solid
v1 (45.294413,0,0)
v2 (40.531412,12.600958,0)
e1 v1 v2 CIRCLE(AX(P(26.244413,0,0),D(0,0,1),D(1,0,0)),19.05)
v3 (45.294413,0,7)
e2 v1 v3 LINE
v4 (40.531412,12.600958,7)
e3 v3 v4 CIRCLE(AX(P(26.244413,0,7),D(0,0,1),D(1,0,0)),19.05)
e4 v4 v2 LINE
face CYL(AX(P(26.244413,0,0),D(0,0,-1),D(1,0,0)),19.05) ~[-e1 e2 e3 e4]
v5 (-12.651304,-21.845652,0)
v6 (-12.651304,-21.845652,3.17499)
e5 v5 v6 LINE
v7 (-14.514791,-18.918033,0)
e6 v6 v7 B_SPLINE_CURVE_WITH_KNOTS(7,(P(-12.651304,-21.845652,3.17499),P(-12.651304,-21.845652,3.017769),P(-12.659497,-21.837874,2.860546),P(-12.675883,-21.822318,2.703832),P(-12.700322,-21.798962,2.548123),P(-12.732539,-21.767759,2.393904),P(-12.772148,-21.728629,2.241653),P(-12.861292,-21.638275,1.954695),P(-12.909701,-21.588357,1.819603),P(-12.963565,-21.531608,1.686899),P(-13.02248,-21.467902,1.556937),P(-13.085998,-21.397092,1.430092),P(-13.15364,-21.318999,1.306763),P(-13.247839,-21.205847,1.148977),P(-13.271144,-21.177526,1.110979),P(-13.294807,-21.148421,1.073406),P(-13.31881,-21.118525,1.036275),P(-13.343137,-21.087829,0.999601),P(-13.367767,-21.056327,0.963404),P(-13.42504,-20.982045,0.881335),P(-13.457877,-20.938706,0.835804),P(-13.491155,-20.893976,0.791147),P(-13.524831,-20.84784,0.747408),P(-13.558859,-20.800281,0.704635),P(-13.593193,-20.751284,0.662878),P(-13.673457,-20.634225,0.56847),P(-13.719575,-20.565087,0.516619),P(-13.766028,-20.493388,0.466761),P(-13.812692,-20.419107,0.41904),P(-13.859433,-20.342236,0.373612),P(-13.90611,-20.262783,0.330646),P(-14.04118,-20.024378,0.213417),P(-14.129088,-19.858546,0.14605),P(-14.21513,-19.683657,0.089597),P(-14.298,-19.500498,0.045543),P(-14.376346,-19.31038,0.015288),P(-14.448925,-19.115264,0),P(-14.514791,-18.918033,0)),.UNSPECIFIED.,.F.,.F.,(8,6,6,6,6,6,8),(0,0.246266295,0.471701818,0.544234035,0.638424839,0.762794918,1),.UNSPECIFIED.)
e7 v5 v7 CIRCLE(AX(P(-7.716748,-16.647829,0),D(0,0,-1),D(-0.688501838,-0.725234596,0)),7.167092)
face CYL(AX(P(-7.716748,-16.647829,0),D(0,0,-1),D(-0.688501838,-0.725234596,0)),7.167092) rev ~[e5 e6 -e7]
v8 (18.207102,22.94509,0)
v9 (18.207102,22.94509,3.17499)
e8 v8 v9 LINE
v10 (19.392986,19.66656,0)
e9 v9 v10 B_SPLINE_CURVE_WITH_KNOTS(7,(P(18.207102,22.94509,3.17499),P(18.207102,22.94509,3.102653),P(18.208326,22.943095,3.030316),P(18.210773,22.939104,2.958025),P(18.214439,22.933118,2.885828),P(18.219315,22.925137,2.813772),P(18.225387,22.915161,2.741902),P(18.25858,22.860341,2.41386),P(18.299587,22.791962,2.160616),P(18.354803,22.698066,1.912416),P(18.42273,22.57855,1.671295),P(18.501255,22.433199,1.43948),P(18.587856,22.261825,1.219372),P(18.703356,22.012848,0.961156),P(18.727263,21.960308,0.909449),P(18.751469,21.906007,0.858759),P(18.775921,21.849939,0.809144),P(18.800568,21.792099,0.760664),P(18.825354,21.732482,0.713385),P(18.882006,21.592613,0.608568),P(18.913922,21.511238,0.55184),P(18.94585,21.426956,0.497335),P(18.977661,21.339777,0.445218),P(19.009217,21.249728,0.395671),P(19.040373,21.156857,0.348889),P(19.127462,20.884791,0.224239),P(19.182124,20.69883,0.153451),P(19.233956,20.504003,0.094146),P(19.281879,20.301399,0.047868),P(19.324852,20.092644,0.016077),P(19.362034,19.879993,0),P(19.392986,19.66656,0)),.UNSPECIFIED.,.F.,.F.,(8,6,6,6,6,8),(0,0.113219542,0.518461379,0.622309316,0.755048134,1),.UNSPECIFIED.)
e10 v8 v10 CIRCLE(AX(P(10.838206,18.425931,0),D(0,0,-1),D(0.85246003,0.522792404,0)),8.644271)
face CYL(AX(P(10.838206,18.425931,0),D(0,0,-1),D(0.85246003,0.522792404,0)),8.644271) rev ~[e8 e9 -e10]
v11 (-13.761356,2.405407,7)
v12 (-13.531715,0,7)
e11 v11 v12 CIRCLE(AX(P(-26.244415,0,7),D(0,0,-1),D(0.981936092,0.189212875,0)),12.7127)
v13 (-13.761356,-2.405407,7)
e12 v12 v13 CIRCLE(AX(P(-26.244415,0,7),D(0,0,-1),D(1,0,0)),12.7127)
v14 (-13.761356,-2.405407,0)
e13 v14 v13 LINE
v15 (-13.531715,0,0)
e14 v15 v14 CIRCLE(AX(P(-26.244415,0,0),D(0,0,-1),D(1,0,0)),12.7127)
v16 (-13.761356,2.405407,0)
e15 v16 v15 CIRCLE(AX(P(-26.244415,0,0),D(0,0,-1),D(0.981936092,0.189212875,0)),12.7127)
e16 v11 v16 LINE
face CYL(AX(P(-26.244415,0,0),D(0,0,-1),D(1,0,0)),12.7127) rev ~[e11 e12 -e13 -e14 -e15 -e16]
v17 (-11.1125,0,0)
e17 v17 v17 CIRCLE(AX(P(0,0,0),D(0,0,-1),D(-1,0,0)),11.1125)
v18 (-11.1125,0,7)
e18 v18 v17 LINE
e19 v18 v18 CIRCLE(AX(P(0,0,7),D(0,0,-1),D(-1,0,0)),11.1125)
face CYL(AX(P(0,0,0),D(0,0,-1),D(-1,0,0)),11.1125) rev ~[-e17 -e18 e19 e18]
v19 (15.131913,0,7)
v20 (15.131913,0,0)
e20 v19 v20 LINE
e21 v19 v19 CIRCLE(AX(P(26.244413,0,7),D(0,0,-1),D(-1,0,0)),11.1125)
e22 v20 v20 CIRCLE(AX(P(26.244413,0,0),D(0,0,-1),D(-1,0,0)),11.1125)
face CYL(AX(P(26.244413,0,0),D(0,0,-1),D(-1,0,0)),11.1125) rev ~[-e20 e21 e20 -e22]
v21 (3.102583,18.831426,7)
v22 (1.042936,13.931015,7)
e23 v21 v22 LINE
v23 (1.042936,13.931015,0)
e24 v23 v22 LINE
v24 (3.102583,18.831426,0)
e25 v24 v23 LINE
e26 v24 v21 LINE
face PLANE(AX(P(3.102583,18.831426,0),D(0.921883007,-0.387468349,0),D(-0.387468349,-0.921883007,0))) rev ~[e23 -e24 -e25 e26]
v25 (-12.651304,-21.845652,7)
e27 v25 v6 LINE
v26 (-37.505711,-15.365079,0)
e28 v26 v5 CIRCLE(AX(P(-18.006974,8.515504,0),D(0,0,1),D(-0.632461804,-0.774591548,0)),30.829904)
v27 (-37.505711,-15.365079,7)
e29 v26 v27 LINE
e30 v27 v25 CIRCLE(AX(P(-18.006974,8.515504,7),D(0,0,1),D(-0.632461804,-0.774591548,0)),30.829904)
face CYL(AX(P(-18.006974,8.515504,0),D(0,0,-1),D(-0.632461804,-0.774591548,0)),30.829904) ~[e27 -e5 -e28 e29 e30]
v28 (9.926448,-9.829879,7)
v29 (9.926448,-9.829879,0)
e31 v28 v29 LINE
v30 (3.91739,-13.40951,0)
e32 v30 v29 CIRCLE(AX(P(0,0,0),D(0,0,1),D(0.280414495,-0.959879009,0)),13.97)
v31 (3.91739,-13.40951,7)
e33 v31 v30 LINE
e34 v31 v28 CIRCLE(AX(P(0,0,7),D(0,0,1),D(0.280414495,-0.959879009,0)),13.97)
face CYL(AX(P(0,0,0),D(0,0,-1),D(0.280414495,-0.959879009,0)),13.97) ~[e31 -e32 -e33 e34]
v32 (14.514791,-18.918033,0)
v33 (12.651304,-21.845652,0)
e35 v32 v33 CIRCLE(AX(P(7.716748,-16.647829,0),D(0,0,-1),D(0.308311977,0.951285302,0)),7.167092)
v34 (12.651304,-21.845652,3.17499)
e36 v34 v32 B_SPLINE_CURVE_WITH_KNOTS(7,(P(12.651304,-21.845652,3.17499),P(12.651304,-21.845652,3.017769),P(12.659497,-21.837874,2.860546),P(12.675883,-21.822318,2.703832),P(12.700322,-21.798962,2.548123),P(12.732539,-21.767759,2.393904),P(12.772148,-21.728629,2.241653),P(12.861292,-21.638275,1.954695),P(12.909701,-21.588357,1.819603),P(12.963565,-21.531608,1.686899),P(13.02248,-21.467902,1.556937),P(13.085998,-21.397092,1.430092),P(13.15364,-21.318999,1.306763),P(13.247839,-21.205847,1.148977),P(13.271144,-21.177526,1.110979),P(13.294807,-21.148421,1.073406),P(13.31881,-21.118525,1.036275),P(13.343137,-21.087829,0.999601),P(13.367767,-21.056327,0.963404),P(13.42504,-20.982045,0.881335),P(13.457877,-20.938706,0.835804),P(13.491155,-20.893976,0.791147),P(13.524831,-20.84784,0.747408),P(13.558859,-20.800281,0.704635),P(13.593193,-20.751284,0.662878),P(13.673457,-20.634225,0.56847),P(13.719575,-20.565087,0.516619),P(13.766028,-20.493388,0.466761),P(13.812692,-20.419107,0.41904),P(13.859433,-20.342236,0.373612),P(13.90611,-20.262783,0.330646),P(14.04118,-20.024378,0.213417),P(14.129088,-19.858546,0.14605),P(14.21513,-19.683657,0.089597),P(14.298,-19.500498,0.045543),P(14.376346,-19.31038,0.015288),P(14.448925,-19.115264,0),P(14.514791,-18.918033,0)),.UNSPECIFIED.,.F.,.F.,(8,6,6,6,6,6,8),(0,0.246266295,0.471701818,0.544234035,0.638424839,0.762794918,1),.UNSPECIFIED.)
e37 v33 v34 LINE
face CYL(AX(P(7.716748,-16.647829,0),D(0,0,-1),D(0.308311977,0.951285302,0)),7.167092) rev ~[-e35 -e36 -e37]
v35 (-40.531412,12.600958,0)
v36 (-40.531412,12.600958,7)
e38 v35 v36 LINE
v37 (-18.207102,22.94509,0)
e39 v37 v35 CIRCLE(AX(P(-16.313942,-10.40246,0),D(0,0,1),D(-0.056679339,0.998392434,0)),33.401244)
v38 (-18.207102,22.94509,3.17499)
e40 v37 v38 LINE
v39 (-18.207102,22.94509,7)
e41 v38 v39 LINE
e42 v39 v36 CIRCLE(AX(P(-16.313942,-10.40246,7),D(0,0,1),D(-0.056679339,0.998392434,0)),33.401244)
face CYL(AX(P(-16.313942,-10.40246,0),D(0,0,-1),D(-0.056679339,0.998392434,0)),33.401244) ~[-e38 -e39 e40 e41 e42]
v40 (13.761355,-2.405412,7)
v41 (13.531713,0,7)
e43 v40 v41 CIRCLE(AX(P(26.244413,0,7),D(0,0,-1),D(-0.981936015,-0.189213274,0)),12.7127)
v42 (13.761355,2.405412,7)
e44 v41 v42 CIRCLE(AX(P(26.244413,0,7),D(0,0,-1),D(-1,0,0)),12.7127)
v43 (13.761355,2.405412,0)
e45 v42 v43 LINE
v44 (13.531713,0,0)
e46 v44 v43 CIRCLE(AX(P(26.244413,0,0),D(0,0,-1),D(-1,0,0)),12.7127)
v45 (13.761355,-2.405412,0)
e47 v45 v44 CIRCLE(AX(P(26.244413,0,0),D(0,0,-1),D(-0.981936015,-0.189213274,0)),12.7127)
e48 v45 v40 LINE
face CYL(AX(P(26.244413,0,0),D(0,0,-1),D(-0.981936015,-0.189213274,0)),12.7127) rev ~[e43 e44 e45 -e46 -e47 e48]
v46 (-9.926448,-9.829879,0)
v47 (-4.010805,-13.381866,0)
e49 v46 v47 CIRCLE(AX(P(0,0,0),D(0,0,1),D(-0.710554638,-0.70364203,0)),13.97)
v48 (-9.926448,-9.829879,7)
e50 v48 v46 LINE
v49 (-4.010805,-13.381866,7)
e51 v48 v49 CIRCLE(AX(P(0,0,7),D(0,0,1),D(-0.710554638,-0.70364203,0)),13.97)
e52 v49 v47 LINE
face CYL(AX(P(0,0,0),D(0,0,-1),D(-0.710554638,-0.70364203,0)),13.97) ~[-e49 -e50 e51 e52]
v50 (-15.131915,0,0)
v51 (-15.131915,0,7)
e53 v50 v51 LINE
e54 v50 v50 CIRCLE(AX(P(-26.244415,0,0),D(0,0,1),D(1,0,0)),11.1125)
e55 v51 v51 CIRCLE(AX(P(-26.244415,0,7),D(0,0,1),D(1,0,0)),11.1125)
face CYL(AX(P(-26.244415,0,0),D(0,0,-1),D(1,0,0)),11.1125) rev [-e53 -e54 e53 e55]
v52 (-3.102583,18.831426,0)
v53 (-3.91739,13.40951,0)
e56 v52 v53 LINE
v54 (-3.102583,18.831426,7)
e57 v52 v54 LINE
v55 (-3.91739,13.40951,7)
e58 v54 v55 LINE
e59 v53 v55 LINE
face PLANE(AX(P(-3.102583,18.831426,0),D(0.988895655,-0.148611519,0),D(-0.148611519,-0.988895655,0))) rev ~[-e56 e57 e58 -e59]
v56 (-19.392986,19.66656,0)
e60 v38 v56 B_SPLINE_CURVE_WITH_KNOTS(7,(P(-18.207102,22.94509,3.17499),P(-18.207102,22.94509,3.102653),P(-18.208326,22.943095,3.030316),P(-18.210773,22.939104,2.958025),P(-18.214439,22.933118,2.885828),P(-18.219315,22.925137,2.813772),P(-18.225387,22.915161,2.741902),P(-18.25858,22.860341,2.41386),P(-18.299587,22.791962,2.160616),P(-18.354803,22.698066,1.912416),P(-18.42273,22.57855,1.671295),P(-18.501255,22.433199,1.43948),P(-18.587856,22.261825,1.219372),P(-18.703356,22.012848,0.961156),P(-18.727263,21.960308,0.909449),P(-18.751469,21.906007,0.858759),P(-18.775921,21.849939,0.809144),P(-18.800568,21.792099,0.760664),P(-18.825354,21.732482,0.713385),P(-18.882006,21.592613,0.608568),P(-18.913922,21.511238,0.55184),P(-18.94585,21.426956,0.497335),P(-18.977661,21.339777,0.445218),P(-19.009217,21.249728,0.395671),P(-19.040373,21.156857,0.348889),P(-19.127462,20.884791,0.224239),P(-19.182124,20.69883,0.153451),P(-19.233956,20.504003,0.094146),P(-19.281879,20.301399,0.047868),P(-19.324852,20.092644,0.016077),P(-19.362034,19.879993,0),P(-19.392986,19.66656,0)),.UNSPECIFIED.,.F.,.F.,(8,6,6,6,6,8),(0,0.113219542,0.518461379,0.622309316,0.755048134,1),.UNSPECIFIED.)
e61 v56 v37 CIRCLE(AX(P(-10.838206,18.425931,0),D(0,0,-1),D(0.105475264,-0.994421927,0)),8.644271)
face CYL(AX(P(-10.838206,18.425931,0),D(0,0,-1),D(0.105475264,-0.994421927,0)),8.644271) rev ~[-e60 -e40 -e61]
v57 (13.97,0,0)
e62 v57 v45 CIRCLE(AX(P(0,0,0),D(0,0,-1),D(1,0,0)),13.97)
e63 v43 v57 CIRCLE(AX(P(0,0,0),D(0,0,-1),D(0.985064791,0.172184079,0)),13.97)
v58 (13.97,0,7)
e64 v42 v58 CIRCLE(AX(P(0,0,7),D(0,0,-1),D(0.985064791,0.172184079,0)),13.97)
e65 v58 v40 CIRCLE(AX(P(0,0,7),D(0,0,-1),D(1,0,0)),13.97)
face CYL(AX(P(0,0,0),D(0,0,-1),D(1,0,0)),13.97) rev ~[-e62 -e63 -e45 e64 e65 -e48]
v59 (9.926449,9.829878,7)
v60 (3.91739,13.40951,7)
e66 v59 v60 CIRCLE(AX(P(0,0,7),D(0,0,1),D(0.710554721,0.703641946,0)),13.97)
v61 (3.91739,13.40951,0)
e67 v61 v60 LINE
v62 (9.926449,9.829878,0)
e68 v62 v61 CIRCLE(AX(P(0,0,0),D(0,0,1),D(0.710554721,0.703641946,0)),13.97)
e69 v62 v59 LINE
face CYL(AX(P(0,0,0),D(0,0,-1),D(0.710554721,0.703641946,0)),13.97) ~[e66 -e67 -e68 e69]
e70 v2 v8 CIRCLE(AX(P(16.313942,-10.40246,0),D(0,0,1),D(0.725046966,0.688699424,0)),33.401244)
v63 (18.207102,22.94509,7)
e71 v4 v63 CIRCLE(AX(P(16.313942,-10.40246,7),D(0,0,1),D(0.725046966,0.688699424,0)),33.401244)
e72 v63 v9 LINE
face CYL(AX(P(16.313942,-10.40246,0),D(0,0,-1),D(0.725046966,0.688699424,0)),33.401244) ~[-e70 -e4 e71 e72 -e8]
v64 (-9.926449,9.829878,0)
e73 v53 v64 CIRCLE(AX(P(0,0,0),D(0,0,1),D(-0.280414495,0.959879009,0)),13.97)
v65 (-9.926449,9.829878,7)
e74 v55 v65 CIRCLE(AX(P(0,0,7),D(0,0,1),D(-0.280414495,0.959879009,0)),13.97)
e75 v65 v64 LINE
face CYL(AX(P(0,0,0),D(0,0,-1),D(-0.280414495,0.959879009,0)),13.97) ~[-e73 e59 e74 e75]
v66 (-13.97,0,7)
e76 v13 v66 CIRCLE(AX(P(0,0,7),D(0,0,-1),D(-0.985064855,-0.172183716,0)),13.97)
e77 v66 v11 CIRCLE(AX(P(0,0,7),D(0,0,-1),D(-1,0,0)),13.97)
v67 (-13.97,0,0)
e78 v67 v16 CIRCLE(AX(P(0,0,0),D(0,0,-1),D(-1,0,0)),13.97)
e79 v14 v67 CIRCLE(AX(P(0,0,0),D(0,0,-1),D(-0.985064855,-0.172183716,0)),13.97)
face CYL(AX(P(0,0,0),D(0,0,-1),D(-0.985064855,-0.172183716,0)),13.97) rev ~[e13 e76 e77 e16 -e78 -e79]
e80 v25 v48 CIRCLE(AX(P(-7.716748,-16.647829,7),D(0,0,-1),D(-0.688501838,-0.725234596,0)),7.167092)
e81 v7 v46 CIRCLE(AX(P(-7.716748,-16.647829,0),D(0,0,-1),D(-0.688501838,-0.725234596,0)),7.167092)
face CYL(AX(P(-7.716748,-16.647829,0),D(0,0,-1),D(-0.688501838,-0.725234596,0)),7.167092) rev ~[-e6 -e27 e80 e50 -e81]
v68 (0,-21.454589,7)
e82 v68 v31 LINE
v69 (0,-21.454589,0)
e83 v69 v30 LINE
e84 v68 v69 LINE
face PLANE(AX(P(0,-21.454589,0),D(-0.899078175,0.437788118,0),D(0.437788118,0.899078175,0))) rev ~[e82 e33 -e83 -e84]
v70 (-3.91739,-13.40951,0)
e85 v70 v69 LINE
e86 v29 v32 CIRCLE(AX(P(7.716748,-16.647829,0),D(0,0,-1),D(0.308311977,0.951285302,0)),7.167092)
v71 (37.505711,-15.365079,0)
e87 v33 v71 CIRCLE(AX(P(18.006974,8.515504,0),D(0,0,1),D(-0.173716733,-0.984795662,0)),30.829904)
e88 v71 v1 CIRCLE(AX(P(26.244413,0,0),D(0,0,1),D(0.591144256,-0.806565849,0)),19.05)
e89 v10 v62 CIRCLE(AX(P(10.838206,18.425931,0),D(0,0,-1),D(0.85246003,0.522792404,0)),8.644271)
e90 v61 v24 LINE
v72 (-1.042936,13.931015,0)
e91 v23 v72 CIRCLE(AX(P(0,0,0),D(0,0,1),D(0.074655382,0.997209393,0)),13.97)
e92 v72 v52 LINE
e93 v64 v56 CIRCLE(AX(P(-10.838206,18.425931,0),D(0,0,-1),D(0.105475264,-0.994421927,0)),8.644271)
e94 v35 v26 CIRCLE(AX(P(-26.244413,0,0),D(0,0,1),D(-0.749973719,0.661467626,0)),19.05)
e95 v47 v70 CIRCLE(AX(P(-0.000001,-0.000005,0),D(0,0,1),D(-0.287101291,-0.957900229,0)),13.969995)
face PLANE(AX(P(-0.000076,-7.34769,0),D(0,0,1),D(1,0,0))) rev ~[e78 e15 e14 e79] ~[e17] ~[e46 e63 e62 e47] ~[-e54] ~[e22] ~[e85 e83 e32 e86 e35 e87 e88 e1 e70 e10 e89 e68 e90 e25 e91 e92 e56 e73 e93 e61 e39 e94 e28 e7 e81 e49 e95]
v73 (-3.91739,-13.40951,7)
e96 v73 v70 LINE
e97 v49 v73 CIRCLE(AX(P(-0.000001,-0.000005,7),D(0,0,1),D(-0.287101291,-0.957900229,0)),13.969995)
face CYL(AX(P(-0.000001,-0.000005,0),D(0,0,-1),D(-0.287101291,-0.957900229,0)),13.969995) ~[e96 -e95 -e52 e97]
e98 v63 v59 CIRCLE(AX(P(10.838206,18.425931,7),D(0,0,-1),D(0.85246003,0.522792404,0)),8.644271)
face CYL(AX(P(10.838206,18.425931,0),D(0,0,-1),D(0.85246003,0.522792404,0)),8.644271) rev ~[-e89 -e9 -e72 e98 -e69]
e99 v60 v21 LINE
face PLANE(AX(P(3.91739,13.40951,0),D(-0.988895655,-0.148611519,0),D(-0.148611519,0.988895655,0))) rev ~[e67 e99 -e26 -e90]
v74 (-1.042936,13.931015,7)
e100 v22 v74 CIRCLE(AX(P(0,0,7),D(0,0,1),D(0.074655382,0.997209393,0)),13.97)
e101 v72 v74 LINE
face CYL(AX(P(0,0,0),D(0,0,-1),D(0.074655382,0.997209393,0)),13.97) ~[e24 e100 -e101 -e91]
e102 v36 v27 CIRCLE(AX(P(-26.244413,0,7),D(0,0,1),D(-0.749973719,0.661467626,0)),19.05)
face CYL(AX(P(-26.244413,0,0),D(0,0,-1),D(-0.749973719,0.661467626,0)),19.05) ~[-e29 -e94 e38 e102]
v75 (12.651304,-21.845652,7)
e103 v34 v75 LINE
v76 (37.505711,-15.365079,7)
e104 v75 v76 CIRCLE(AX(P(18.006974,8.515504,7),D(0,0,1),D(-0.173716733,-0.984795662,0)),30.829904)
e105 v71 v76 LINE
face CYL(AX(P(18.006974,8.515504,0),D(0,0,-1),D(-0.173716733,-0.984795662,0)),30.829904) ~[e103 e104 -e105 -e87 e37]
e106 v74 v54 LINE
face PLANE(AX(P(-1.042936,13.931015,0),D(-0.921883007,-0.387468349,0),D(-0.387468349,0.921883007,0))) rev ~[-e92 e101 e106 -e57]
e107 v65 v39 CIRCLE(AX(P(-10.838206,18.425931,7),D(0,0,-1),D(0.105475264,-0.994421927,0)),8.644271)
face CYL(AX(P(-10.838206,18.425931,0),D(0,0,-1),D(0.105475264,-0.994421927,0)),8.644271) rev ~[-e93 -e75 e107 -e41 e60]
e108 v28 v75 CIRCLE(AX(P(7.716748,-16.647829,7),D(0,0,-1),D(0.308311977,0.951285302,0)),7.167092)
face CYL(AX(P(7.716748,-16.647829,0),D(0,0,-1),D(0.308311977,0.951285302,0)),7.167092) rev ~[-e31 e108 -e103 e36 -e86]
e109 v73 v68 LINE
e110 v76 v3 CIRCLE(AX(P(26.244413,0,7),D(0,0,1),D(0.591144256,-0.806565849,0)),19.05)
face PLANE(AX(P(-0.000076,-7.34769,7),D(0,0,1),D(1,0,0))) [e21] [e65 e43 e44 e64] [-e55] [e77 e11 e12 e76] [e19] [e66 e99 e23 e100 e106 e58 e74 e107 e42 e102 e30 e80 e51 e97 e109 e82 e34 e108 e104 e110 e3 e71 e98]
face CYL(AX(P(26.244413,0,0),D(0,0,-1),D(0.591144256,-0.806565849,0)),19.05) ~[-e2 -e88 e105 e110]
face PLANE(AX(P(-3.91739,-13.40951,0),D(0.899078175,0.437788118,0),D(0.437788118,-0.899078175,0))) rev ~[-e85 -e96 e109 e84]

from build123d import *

# Parameters (mm, degrees)
F0_R     = 11.1125
F1_DEPTH = 6.35
F2_R     = 3.17499
F3_DEPTH = 7


# Not quite as in the source:
# - a fillet or chamfer is up to 0.001 mm smaller than in the source, because OpenCascade refuses the exact size


with BuildPart() as f1:
    # F0 (on Top) → F1 (new body)
    with BuildSketch(Plane.XY):
        with BuildLine():
            ThreePointArc((-9.9264482926, -9.8298791597), (-7.1913775024, -11.9768522417), (-4.010805007, -13.3818662075))
            ThreePointArc((-4.010805007, -13.3818662075), (-3.9641218469, -13.3957694062), (-3.9173904939, -13.4095097494))
            ThreePointArc((-3.9173904939, -13.4095097494), (0, -13.97), (3.9173904939, -13.4095097494))
            ThreePointArc((3.9173904939, -13.4095097494), (7.1495738947, -12.001853737), (9.9264482926, -9.8298791597))
            ThreePointArc((9.9264482926, -9.8298791597), (12.4120380065, -6.4111007266), (13.7613551332, -2.4054115859))
            ThreePointArc((13.7613551332, -2.4054115859), (13.5892538356, -1.2081742794), (13.5317131076, 0))
            Line((13.5317131076, 0), (11.1125, 0))
            ThreePointArc((11.1125, 0), (0, -11.1125), (-11.1125, 0))
            Line((-11.1125, 0), (-13.5317149703, 0))
            ThreePointArc((-13.5317149703, 0), (-13.589255453, -1.2081717101), (-13.7613560192, -2.4054065173))
            ThreePointArc((-13.7613560192, -2.4054065173), (-12.4120391871, -6.4110984408), (-9.9264482926, -9.8298791597))
        make_face()
        with BuildLine():
            ThreePointArc((3.9173904939, -13.4095097494), (0, -13.97), (-3.9173904939, -13.4095097494))
            Line((-3.9173904939, -13.4095097494), (0, -21.4545894414))
            Line((0, -21.4545894414), (3.9173904939, -13.4095097494))
        make_face()
        with BuildLine():
            ThreePointArc((-12.6513041413, -21.8456521056), (-14.7063688094, -15.0627697401), (-9.9264482926, -9.8298791597))
            ThreePointArc((-9.9264482926, -9.8298791597), (-12.4120391871, -6.4110984408), (-13.7613560192, -2.4054065173))
            ThreePointArc((-13.7613560192, -2.4054065173), (-13.9177412605, -1.2072192038), (-13.97, 0))
            ThreePointArc((-13.97, 0), (-13.9177412605, 1.2072192038), (-13.7613560192, 2.4054065173))
            ThreePointArc((-13.7613560192, 2.4054065173), (-12.4120395648, 6.4110977096), (-9.9264494507, 9.8298779902))
            ThreePointArc((-9.9264494507, 9.8298779902), (-18.1475057056, 13.8110021796), (-18.2071019663, 22.9450902043))
            ThreePointArc((-18.2071019663, 22.9450902043), (-30.3564318276, 19.9035068059), (-40.5314124536, 12.6009582845))
            ThreePointArc((-40.5314124536, 12.6009582845), (-45.1838875342, -2.0490994228), (-37.5057111895, -15.3650794177))
            ThreePointArc((-37.5057111895, -15.3650794177), (-25.7855371398, -21.3169777129), (-12.6513041413, -21.8456521056))
        make_face()
        with Locations((-26.2444149703, 0)):
            Circle(F0_R, mode=Mode.SUBTRACT)
        with BuildLine():
            ThreePointArc((13.7613551332, -2.4054115859), (12.4120380065, -6.4111007266), (9.9264482926, -9.8298791597))
            ThreePointArc((9.9264482926, -9.8298791597), (14.7063688094, -15.0627697401), (12.6513041413, -21.8456521056))
            ThreePointArc((12.6513041413, -21.8456521056), (25.7855371398, -21.3169777129), (37.5057111895, -15.3650794177))
            ThreePointArc((37.5057111895, -15.3650794177), (43.2360320484, -8.6132099574), (45.2944131076, 0))
            Line((45.2944131076, 0), (37.3569131076, 0))
            ThreePointArc((37.3569131076, 0), (26.2444131076, -11.1125), (15.1319131076, 0))
            Line((15.1319131076, 0), (13.97, 0))
            ThreePointArc((13.97, 0), (13.9177410382, -1.2072217669), (13.7613551332, -2.4054115859))
        make_face()
        with BuildLine():
            ThreePointArc((-13.7613560192, 2.4054065173), (-13.589255453, 1.2081717101), (-13.5317149703, 0))
            Line((-13.5317149703, 0), (-11.1125, 0))
            ThreePointArc((-11.1125, 0), (0, 11.1125), (11.1125, 0))
            Line((11.1125, 0), (13.5317131076, 0))
            ThreePointArc((13.5317131076, 0), (13.5892538356, 1.2081742794), (13.7613551332, 2.4054115859))
            ThreePointArc((13.7613551332, 2.4054115859), (12.4120383841, 6.4110999954), (9.9264494507, 9.8298779902))
            ThreePointArc((9.9264494507, 9.8298779902), (7.1495746018, 12.0018533158), (3.9173904939, 13.4095097494))
            ThreePointArc((3.9173904939, 13.4095097494), (2.4938325804, 13.7456065367), (1.0429356844, 13.9310152235))
            ThreePointArc((1.0429356844, 13.9310152235), (0, 13.97), (-1.0429356844, 13.9310152235))
            ThreePointArc((-1.0429356844, 13.9310152235), (-2.4938325804, 13.7456065367), (-3.9173904939, 13.4095097494))
            ThreePointArc((-3.9173904939, 13.4095097494), (-7.1495746018, 12.0018533158), (-9.9264494507, 9.8298779902))
            ThreePointArc((-9.9264494507, 9.8298779902), (-12.4120395648, 6.4110977096), (-13.7613560192, 2.4054065173))
        make_face()
        with BuildLine():
            ThreePointArc((13.7613551332, 2.4054115859), (13.9177410382, 1.2072217669), (13.97, 0))
            Line((13.97, 0), (15.1319131076, 0))
            ThreePointArc((15.1319131076, 0), (26.2444131076, 11.1125), (37.3569131076, 0))
            Line((37.3569131076, 0), (45.2944131076, 0))
            ThreePointArc((45.2944131076, 0), (44.0639226062, 6.7355460973), (40.5314124536, 12.6009582845))
            ThreePointArc((40.5314124536, 12.6009582845), (30.3564318276, 19.9035068059), (18.2071019663, 22.9450902043))
            ThreePointArc((18.2071019663, 22.9450902043), (18.1475057056, 13.8110021796), (9.9264494507, 9.8298779902))
            ThreePointArc((9.9264494507, 9.8298779902), (12.4120383841, 6.4110999954), (13.7613551332, 2.4054115859))
        make_face()
        with BuildLine():
            Line((-3.102583345, 18.8314262778), (-3.9173904939, 13.4095097494))
            ThreePointArc((-3.9173904939, 13.4095097494), (-2.4938325804, 13.7456065367), (-1.0429356844, 13.9310152235))
            Line((-1.0429356844, 13.9310152235), (-3.102583345, 18.8314262778))
        make_face()
        with BuildLine():
            ThreePointArc((1.0429356844, 13.9310152235), (2.4938325804, 13.7456065367), (3.9173904939, 13.4095097494))
            Line((3.9173904939, 13.4095097494), (3.102583345, 18.8314262778))
            Line((3.102583345, 18.8314262778), (1.0429356844, 13.9310152235))
        make_face()
    extrude(amount=F1_DEPTH)

    # F2 (radius 3.175 in the source; OpenCascade refuses exactly that, so slightly less here)
    f2_edges = [f1.edges().sort_by_distance(p)[0] for p in [
        (-45.183888, -2.049099, 6.35),
        (45.183888, -2.049099, 6.35),
        (45.183888, -2.049099, 0),
        (-45.183888, -2.049099, 0),
    ]]
    fillet(f2_edges, radius=F2_R)

    # F0 (on Top) → F3 (join)
    with BuildSketch(Plane.XY):
        with BuildLine():
            ThreePointArc((-9.9264482926, -9.8298791597), (-7.1913775024, -11.9768522417), (-4.010805007, -13.3818662075))
            ThreePointArc((-4.010805007, -13.3818662075), (-3.9641218469, -13.3957694062), (-3.9173904939, -13.4095097494))
            ThreePointArc((-3.9173904939, -13.4095097494), (0, -13.97), (3.9173904939, -13.4095097494))
            ThreePointArc((3.9173904939, -13.4095097494), (7.1495738947, -12.001853737), (9.9264482926, -9.8298791597))
            ThreePointArc((9.9264482926, -9.8298791597), (12.4120380065, -6.4111007266), (13.7613551332, -2.4054115859))
            ThreePointArc((13.7613551332, -2.4054115859), (13.5892538356, -1.2081742794), (13.5317131076, 0))
            Line((13.5317131076, 0), (11.1125, 0))
            ThreePointArc((11.1125, 0), (0, -11.1125), (-11.1125, 0))
            Line((-11.1125, 0), (-13.5317149703, 0))
            ThreePointArc((-13.5317149703, 0), (-13.589255453, -1.2081717101), (-13.7613560192, -2.4054065173))
            ThreePointArc((-13.7613560192, -2.4054065173), (-12.4120391871, -6.4110984408), (-9.9264482926, -9.8298791597))
        make_face()
        with BuildLine():
            ThreePointArc((3.9173904939, -13.4095097494), (0, -13.97), (-3.9173904939, -13.4095097494))
            Line((-3.9173904939, -13.4095097494), (0, -21.4545894414))
            Line((0, -21.4545894414), (3.9173904939, -13.4095097494))
        make_face()
        with BuildLine():
            ThreePointArc((-12.6513041413, -21.8456521056), (-14.7063688094, -15.0627697401), (-9.9264482926, -9.8298791597))
            ThreePointArc((-9.9264482926, -9.8298791597), (-12.4120391871, -6.4110984408), (-13.7613560192, -2.4054065173))
            ThreePointArc((-13.7613560192, -2.4054065173), (-13.9177412605, -1.2072192038), (-13.97, 0))
            ThreePointArc((-13.97, 0), (-13.9177412605, 1.2072192038), (-13.7613560192, 2.4054065173))
            ThreePointArc((-13.7613560192, 2.4054065173), (-12.4120395648, 6.4110977096), (-9.9264494507, 9.8298779902))
            ThreePointArc((-9.9264494507, 9.8298779902), (-18.1475057056, 13.8110021796), (-18.2071019663, 22.9450902043))
            ThreePointArc((-18.2071019663, 22.9450902043), (-30.3564318276, 19.9035068059), (-40.5314124536, 12.6009582845))
            ThreePointArc((-40.5314124536, 12.6009582845), (-45.1838875342, -2.0490994228), (-37.5057111895, -15.3650794177))
            ThreePointArc((-37.5057111895, -15.3650794177), (-25.7855371398, -21.3169777129), (-12.6513041413, -21.8456521056))
        make_face()
        with Locations((-26.2444149703, 0)):
            Circle(F0_R, mode=Mode.SUBTRACT)
        with BuildLine():
            ThreePointArc((13.7613551332, -2.4054115859), (12.4120380065, -6.4111007266), (9.9264482926, -9.8298791597))
            ThreePointArc((9.9264482926, -9.8298791597), (14.7063688094, -15.0627697401), (12.6513041413, -21.8456521056))
            ThreePointArc((12.6513041413, -21.8456521056), (25.7855371398, -21.3169777129), (37.5057111895, -15.3650794177))
            ThreePointArc((37.5057111895, -15.3650794177), (43.2360320484, -8.6132099574), (45.2944131076, 0))
            Line((45.2944131076, 0), (37.3569131076, 0))
            ThreePointArc((37.3569131076, 0), (26.2444131076, -11.1125), (15.1319131076, 0))
            Line((15.1319131076, 0), (13.97, 0))
            ThreePointArc((13.97, 0), (13.9177410382, -1.2072217669), (13.7613551332, -2.4054115859))
        make_face()
        with BuildLine():
            ThreePointArc((-13.7613560192, 2.4054065173), (-13.589255453, 1.2081717101), (-13.5317149703, 0))
            Line((-13.5317149703, 0), (-11.1125, 0))
            ThreePointArc((-11.1125, 0), (0, 11.1125), (11.1125, 0))
            Line((11.1125, 0), (13.5317131076, 0))
            ThreePointArc((13.5317131076, 0), (13.5892538356, 1.2081742794), (13.7613551332, 2.4054115859))
            ThreePointArc((13.7613551332, 2.4054115859), (12.4120383841, 6.4110999954), (9.9264494507, 9.8298779902))
            ThreePointArc((9.9264494507, 9.8298779902), (7.1495746018, 12.0018533158), (3.9173904939, 13.4095097494))
            ThreePointArc((3.9173904939, 13.4095097494), (2.4938325804, 13.7456065367), (1.0429356844, 13.9310152235))
            ThreePointArc((1.0429356844, 13.9310152235), (0, 13.97), (-1.0429356844, 13.9310152235))
            ThreePointArc((-1.0429356844, 13.9310152235), (-2.4938325804, 13.7456065367), (-3.9173904939, 13.4095097494))
            ThreePointArc((-3.9173904939, 13.4095097494), (-7.1495746018, 12.0018533158), (-9.9264494507, 9.8298779902))
            ThreePointArc((-9.9264494507, 9.8298779902), (-12.4120395648, 6.4110977096), (-13.7613560192, 2.4054065173))
        make_face()
        with BuildLine():
            ThreePointArc((13.7613551332, 2.4054115859), (13.9177410382, 1.2072217669), (13.97, 0))
            Line((13.97, 0), (15.1319131076, 0))
            ThreePointArc((15.1319131076, 0), (26.2444131076, 11.1125), (37.3569131076, 0))
            Line((37.3569131076, 0), (45.2944131076, 0))
            ThreePointArc((45.2944131076, 0), (44.0639226062, 6.7355460973), (40.5314124536, 12.6009582845))
            ThreePointArc((40.5314124536, 12.6009582845), (30.3564318276, 19.9035068059), (18.2071019663, 22.9450902043))
            ThreePointArc((18.2071019663, 22.9450902043), (18.1475057056, 13.8110021796), (9.9264494507, 9.8298779902))
            ThreePointArc((9.9264494507, 9.8298779902), (12.4120383841, 6.4110999954), (13.7613551332, 2.4054115859))
        make_face()
        with BuildLine():
            Line((-3.102583345, 18.8314262778), (-3.9173904939, 13.4095097494))
            ThreePointArc((-3.9173904939, 13.4095097494), (-2.4938325804, 13.7456065367), (-1.0429356844, 13.9310152235))
            Line((-1.0429356844, 13.9310152235), (-3.102583345, 18.8314262778))
        make_face()
        with BuildLine():
            ThreePointArc((1.0429356844, 13.9310152235), (2.4938325804, 13.7456065367), (3.9173904939, 13.4095097494))
            Line((3.9173904939, 13.4095097494), (3.102583345, 18.8314262778))
            Line((3.102583345, 18.8314262778), (1.0429356844, 13.9310152235))
        make_face()
    extrude(amount=F3_DEPTH)


solid = f1.part
